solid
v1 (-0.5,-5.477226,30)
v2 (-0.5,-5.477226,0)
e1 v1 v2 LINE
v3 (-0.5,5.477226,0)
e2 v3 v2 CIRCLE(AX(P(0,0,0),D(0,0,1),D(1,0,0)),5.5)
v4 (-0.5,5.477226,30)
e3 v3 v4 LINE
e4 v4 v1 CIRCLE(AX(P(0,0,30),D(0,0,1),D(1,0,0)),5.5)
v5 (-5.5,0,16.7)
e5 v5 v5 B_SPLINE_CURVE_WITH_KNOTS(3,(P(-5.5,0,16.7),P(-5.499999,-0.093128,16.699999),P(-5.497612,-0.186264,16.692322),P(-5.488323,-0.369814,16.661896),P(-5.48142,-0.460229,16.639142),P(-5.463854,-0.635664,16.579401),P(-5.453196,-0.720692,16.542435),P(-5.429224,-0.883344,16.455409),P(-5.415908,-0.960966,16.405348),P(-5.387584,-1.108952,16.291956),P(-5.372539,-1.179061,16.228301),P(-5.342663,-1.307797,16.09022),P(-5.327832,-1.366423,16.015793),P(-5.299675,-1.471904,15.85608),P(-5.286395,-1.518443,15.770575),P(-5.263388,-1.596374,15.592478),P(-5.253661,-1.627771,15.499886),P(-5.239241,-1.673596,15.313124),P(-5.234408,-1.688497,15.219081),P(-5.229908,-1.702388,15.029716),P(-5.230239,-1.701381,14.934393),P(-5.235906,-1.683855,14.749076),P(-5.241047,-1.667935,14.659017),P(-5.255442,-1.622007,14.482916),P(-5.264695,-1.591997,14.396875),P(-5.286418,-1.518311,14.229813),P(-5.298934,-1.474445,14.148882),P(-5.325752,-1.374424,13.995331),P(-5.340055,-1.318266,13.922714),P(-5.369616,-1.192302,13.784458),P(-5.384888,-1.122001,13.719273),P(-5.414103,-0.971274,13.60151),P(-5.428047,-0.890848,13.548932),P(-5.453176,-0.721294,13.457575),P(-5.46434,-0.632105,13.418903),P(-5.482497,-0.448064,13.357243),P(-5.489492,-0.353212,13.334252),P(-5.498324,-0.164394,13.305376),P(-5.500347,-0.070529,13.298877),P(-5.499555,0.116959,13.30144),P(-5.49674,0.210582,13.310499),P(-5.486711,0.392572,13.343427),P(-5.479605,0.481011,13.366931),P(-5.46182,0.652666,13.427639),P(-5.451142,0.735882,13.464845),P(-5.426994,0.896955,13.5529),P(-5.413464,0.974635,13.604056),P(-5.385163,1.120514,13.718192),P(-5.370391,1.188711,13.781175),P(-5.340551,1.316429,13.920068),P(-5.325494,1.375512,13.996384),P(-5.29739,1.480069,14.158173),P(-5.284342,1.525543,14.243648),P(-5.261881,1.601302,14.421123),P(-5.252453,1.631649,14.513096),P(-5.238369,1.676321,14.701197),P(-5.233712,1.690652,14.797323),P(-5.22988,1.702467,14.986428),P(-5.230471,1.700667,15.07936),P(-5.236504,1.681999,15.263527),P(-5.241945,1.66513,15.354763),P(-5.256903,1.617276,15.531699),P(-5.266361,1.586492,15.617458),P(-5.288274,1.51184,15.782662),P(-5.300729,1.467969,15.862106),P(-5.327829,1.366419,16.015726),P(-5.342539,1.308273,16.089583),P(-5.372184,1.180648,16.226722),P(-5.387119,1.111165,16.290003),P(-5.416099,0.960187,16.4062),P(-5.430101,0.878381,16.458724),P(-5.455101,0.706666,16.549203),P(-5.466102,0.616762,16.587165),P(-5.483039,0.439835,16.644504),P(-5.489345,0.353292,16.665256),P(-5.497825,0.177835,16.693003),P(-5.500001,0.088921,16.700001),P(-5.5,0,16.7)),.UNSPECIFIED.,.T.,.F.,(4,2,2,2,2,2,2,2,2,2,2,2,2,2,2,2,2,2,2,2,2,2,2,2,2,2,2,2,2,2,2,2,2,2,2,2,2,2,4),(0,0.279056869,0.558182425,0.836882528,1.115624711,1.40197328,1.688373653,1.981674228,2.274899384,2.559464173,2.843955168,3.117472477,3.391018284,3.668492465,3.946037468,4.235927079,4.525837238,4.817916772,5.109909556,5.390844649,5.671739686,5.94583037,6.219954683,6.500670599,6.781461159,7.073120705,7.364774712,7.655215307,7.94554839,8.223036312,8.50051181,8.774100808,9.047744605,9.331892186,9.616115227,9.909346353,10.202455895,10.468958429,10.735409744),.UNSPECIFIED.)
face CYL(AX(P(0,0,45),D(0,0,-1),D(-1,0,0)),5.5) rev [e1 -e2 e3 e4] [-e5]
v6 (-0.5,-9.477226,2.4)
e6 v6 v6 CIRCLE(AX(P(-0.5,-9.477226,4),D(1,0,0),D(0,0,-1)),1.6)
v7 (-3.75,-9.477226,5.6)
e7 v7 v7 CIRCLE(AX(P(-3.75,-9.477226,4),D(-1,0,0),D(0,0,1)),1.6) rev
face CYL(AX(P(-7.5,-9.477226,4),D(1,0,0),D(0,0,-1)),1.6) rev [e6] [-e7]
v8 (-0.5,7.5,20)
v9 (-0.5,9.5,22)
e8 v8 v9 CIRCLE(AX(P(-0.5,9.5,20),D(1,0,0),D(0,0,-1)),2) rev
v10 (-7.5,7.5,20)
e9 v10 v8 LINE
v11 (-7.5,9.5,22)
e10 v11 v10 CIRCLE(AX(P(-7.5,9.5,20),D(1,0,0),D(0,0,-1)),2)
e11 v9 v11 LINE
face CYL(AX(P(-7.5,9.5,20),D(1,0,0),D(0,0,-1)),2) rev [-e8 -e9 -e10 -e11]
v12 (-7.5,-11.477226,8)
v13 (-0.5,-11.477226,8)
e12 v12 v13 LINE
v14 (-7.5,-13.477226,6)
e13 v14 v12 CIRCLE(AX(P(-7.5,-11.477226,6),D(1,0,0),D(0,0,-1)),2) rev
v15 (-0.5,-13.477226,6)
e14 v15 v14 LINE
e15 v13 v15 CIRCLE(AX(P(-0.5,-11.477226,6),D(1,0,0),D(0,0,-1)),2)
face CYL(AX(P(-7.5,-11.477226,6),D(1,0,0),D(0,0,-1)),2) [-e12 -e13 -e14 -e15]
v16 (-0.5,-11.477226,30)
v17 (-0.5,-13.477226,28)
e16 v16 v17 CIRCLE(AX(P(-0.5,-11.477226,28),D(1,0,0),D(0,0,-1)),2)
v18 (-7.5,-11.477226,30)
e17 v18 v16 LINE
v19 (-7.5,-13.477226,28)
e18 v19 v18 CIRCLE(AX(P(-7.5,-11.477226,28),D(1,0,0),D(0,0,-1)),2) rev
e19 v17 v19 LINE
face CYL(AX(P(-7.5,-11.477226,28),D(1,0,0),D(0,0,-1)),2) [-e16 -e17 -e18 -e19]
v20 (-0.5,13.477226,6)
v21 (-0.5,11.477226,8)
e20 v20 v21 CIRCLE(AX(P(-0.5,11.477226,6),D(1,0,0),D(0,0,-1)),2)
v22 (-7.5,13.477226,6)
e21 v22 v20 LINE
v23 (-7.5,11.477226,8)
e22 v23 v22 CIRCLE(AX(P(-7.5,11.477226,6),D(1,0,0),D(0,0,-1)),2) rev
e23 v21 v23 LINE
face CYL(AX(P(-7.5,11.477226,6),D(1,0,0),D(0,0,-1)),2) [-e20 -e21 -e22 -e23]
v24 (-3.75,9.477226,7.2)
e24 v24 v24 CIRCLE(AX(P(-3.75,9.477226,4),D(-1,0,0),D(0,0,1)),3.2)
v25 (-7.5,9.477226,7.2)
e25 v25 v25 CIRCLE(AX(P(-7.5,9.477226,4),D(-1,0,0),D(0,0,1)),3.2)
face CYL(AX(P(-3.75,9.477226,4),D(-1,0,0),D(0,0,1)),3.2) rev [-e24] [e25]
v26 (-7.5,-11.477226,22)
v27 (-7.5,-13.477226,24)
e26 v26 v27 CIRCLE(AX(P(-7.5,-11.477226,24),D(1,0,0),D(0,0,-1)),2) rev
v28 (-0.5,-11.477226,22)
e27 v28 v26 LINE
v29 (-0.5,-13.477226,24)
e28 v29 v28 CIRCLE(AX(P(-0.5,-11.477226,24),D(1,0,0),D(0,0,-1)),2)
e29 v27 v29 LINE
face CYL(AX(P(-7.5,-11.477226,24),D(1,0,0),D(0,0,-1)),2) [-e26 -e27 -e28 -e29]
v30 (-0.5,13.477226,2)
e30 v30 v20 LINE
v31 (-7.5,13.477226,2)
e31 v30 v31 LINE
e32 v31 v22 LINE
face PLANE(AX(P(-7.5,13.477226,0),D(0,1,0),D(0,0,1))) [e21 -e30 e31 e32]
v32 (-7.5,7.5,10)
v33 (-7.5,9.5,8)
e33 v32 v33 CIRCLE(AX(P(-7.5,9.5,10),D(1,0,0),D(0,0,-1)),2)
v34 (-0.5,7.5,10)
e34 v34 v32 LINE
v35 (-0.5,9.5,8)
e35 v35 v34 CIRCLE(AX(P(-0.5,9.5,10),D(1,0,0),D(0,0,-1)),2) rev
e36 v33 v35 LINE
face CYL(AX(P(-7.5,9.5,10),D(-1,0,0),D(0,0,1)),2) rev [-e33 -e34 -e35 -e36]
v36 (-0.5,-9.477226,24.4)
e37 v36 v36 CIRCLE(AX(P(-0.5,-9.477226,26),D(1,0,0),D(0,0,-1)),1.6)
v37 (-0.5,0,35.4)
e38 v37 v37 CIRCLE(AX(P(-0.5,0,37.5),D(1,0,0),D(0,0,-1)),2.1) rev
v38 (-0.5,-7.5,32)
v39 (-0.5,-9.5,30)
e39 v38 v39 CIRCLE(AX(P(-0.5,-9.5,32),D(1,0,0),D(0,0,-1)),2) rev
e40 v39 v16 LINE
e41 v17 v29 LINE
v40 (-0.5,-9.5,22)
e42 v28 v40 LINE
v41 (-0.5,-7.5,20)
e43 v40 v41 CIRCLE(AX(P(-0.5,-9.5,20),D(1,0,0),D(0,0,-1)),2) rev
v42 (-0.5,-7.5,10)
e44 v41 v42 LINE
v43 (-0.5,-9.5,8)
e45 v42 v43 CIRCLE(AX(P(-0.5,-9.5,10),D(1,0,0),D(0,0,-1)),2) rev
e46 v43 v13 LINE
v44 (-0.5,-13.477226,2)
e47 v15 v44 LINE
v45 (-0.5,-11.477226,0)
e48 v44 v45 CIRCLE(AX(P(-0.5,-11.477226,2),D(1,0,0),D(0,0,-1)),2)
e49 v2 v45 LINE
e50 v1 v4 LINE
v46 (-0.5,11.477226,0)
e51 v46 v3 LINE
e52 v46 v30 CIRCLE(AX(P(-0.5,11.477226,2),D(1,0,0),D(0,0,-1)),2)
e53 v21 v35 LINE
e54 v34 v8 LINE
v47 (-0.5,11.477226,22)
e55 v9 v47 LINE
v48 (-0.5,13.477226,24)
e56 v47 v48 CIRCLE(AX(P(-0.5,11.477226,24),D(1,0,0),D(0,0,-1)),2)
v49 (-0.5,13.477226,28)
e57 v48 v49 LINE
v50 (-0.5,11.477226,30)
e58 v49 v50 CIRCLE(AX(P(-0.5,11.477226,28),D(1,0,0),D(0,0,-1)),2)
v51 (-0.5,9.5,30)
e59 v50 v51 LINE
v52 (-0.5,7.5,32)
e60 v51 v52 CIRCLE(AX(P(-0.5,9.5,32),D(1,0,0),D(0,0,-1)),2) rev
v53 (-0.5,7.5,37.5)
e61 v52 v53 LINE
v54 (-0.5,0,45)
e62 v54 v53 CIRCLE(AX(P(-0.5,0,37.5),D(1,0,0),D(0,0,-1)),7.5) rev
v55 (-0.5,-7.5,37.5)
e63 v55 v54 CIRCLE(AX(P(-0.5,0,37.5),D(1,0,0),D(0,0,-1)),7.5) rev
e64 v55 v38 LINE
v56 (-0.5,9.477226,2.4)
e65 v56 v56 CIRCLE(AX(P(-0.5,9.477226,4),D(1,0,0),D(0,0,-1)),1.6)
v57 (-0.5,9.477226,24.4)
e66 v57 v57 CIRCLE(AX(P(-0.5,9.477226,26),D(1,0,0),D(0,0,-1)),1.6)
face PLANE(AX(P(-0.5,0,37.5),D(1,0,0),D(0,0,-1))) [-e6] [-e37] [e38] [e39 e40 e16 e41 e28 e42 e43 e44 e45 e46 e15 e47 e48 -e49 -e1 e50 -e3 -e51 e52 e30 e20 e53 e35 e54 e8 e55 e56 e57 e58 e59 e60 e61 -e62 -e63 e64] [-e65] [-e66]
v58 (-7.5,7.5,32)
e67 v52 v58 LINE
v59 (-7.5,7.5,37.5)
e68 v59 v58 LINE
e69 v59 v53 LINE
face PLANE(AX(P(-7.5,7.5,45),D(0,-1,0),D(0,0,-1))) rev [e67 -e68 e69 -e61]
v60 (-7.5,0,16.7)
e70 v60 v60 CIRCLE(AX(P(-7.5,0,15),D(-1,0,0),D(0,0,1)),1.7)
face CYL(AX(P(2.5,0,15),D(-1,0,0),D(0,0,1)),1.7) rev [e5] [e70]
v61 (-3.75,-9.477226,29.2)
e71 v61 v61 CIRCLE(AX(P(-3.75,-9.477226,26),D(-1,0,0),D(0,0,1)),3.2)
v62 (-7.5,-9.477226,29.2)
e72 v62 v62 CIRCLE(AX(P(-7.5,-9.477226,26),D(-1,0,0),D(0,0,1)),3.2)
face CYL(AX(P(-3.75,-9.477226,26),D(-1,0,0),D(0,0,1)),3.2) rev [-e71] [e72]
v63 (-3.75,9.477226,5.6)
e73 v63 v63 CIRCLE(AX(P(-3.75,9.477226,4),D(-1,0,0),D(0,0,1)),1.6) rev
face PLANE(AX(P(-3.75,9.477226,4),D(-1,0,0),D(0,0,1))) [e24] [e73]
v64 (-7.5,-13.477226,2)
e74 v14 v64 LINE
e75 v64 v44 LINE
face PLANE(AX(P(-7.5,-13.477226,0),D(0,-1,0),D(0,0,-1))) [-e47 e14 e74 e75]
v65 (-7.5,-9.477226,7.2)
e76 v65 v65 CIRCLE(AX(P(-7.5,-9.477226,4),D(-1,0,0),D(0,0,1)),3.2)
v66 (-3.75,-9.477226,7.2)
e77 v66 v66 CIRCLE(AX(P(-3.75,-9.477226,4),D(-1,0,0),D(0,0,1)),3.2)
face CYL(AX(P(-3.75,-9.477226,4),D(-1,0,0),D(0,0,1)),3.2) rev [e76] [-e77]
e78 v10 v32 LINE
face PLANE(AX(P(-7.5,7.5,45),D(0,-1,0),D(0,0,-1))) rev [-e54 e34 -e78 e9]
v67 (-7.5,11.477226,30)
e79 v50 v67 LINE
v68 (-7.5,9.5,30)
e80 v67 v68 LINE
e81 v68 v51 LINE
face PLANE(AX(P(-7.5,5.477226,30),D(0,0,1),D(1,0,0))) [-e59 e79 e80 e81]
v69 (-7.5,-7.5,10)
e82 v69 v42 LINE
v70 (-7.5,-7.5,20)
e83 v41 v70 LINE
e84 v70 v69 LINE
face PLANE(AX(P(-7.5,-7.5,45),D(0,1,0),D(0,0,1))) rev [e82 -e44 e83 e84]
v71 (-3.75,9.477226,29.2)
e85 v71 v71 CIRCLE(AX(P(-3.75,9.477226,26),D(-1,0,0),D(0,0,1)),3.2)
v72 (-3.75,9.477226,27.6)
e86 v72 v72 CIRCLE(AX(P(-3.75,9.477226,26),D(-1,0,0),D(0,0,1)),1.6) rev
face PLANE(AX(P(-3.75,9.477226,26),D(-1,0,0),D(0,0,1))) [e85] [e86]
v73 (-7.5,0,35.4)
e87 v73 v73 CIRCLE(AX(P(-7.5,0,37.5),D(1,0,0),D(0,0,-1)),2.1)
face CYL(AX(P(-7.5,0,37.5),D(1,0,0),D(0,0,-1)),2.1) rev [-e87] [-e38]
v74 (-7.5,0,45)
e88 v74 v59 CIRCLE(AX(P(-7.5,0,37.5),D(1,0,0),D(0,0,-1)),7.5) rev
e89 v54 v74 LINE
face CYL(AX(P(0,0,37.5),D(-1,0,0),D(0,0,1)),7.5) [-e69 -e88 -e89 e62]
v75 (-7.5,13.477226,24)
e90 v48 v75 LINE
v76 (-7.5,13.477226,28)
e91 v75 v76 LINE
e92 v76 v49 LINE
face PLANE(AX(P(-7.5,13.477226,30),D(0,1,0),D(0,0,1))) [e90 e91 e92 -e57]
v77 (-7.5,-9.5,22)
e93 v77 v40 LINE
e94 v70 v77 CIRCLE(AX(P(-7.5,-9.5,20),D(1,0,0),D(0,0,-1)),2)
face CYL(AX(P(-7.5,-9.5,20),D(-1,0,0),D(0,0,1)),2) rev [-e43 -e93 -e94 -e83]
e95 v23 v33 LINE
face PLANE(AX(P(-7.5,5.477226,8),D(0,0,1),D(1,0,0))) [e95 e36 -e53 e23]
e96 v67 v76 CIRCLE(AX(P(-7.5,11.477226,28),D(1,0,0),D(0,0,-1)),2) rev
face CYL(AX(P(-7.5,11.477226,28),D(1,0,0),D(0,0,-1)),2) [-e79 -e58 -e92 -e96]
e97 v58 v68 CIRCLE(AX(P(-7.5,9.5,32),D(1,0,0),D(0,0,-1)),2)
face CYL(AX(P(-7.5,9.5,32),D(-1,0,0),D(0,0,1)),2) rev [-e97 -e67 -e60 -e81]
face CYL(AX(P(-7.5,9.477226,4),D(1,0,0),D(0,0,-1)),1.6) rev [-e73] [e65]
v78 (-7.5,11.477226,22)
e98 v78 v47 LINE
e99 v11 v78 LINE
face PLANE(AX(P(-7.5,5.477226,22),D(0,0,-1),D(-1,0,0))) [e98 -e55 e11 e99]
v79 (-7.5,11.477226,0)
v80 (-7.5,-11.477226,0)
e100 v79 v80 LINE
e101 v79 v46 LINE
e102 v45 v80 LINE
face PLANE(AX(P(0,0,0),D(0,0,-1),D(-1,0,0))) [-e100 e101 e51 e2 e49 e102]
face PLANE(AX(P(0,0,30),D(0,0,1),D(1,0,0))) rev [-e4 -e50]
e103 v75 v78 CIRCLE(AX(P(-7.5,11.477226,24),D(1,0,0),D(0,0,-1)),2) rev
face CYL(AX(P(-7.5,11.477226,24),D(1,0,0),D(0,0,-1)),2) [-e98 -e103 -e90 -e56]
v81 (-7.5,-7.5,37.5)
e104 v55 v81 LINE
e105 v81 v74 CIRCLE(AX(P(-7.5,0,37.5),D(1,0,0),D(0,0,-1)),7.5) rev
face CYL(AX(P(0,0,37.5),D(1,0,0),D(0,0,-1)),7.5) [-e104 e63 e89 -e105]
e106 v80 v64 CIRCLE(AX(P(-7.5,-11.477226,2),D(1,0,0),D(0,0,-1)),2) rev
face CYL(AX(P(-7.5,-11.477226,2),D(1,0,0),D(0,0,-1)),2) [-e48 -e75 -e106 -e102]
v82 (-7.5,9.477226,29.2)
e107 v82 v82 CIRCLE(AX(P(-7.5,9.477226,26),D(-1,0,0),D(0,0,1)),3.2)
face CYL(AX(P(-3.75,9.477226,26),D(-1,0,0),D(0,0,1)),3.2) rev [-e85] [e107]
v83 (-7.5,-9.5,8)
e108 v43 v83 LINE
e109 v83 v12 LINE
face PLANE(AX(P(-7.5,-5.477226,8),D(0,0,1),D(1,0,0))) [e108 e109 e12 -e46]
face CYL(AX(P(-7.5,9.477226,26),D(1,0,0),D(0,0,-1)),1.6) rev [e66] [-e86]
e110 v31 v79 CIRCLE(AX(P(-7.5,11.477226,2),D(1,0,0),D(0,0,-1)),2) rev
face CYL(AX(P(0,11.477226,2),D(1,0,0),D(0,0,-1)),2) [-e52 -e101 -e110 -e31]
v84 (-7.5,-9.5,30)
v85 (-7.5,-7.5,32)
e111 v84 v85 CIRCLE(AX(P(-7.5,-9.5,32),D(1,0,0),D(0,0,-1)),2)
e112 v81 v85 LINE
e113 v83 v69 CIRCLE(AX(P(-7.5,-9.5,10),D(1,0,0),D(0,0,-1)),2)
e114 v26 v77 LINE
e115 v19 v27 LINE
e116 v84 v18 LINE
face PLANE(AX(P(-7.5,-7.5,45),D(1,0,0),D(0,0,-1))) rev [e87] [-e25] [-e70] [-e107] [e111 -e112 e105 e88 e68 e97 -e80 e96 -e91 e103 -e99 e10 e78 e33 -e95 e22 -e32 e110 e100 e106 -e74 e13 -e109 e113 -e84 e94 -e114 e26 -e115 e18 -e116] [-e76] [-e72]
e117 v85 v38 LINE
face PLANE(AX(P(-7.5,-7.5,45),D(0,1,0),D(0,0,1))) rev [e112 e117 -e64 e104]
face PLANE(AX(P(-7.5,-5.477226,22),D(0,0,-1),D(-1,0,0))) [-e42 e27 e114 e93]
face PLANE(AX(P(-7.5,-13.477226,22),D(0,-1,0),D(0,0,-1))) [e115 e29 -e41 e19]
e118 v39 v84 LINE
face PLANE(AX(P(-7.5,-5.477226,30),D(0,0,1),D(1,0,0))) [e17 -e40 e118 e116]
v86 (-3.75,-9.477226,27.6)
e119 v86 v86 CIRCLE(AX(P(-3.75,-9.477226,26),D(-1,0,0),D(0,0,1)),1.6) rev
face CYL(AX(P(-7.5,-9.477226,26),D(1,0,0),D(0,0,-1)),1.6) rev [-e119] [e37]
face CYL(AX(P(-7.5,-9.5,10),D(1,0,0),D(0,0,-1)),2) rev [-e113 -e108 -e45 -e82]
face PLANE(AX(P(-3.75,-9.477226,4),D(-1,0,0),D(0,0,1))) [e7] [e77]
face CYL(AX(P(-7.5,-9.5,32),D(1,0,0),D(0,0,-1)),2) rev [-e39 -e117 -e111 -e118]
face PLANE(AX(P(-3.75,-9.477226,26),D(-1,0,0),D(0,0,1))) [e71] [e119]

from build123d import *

# Parameters (mm, degrees)
SKETCH_1_W          = 15
SKETCH_1_H          = 15
SKETCH_1_R          = 5.5
EXTRUDE_1_DEPTH     = 45
SKETCH_5_W          = 15
SKETCH_5_H          = 15
EXTRUDE_3_DEPTH     = 15
FILLET_2_R          = 7.5
SKETCH_6_R          = 2.1
CUT_EXTRUDE_1_DEPTH = 49.023431781
CUT_EXTRUDE_2_DEPTH = 8
SKETCH_9_W          = 8
SKETCH_9_H          = 8
SKETCH_9_R          = 1.6
EXTRUDE_4_DEPTH     = 7
FILLET_3_R          = 2
SKETCH_11_R         = 3.2
CUT_EXTRUDE_3_DEPTH = 3.75
SKETCH_12_R         = 1.7
CUT_EXTRUDE_4_DEPTH = 10


with BuildPart() as part:
    # ｽｹｯﾁ1 → ﾎﾞｽ - 押し出し1 (new body)
    with BuildSketch(Plane.XY):
        Rectangle(SKETCH_1_W, SKETCH_1_H)
        with Locations(Location((0, 0, 0), (0, 0, 180))):
            Circle(SKETCH_1_R, mode=Mode.SUBTRACT)
    extrude(amount=EXTRUDE_1_DEPTH)

    # ｽｹｯﾁ5 → ﾎﾞｽ - 押し出し3 (add)
    with BuildSketch(Plane.XY.offset(45)):
        Rectangle(SKETCH_5_W, SKETCH_5_H)
    extrude(amount=-EXTRUDE_3_DEPTH)

    # ﾌｨﾚｯﾄ2
    fillet_2_edges = [part.edges().sort_by_distance(p)[0] for p in [
        (0, -7.5, 45),
        (0, 7.5, 45),
    ]]
    fillet(fillet_2_edges, radius=FILLET_2_R - 0.0001)  # a hair under: the kernel refuses the full size

    # ｽｹｯﾁ6 → ｶｯﾄ - 押し出し1 (cut, through all)
    with BuildSketch(Plane(origin=(7.5, 0, 0), x_dir=(0, 0, -1), z_dir=(1, 0, 0))):
        with Locations((-37.5, 0)):
            Circle(SKETCH_6_R)
    extrude(amount=-CUT_EXTRUDE_1_DEPTH, mode=Mode.SUBTRACT)

    # ｽｹｯﾁ7 → ｶｯﾄ - 押し出し2 (cut)
    with BuildSketch(Plane(origin=(7.5, 0, 0), x_dir=(0, 0, -1), z_dir=(1, 0, 0))):
        with BuildLine():
            Line((-37.5, -9.5), (2, -9.5))
            Line((2, -9.5), (2, 9.5))
            Line((2, 9.5), (-37.5, 9.5))
            ThreePointArc((-37.5, 9.5), (-44.217514421, 6.717514421), (-47, 0))
            ThreePointArc((-47, 0), (-44.217514421, -6.717514421), (-37.5, -9.5))
        make_face()
    extrude(amount=-CUT_EXTRUDE_2_DEPTH, mode=Mode.SUBTRACT)

    # ｽｹｯﾁ9 → ﾎﾞｽ - 押し出し4 (add)
    # profile 1 of 4: a face of its own
    with BuildSketch(Plane(origin=(-0.5, 0, 0), x_dir=(0, 0, -1), z_dir=(1, 0, 0))):
        with Locations((-4, -9.477225575)):
            Rectangle(SKETCH_9_W, SKETCH_9_H)
        with Locations((-4, -9.477225575)):
            Circle(SKETCH_9_R, mode=Mode.SUBTRACT)
    # profile 2 of 4: a face of its own
    with BuildSketch(Plane(origin=(-0.5, 0, 0), x_dir=(0, 0, -1), z_dir=(1, 0, 0))):
        with Locations((-26, 9.477225575)):
            Rectangle(SKETCH_9_W, SKETCH_9_H)
        with Locations((-26, 9.477225575)):
            Circle(SKETCH_9_R, mode=Mode.SUBTRACT)
    # profile 3 of 4: a face of its own
    with BuildSketch(Plane(origin=(-0.5, 0, 0), x_dir=(0, 0, -1), z_dir=(1, 0, 0))):
        with Locations((-4, 9.477225575)):
            Rectangle(SKETCH_9_W, SKETCH_9_H)
        with Locations((-4, 9.477225575)):
            Circle(SKETCH_9_R, mode=Mode.SUBTRACT)
    # profile 4 of 4: a face of its own
    with BuildSketch(Plane(origin=(-0.5, 0, 0), x_dir=(0, 0, -1), z_dir=(1, 0, 0))):
        with Locations((-26, -9.477225575)):
            Rectangle(SKETCH_9_W, SKETCH_9_H)
        with Locations((-26, -9.477225575)):
            Circle(SKETCH_9_R, mode=Mode.SUBTRACT)
    extrude(amount=-EXTRUDE_4_DEPTH)

    # ﾌｨﾚｯﾄ3
    fillet_3_edges = [part.edges().sort_by_distance(p)[0] for p in [
        (-4, 13.477225575, 22),
        (-4, 7.5, 30),
        (-4, 13.477225575, 30),
        (-4, 7.5, 22),
        (-4, 13.477225575, 0),
        (-4, 7.5, 8),
        (-4, 13.477225575, 8),
        (-4, -13.477225575, 30),
        (-4, -7.5, 22),
        (-4, -13.477225575, 22),
        (-4, -7.5, 30),
        (-4, -13.477225575, 8),
        (-4, -13.477225575, 0),
        (-4, -7.5, 8),
    ]]
    fillet(fillet_3_edges, radius=FILLET_3_R)

    # ｽｹｯﾁ11 → ｶｯﾄ - 押し出し3 (cut)
    with BuildSketch(Plane.ZY.offset(7.5)):
        with Locations((4, 9.477225575)):
            Circle(SKETCH_11_R)
        with Locations((26, 9.477225575)):
            Circle(SKETCH_11_R)
        with Locations((26, -9.477225575)):
            Circle(SKETCH_11_R)
        with Locations((4, -9.477225575)):
            Circle(SKETCH_11_R)
    extrude(amount=-CUT_EXTRUDE_3_DEPTH, mode=Mode.SUBTRACT)

    # ｽｹｯﾁ12 → ｶｯﾄ - 押し出し4 (cut)
    with BuildSketch(Plane.ZY.offset(7.5)):
        with Locations((15, 0)):
            Circle(SKETCH_12_R)
    extrude(amount=-CUT_EXTRUDE_4_DEPTH, mode=Mode.SUBTRACT)


solid = part.part
